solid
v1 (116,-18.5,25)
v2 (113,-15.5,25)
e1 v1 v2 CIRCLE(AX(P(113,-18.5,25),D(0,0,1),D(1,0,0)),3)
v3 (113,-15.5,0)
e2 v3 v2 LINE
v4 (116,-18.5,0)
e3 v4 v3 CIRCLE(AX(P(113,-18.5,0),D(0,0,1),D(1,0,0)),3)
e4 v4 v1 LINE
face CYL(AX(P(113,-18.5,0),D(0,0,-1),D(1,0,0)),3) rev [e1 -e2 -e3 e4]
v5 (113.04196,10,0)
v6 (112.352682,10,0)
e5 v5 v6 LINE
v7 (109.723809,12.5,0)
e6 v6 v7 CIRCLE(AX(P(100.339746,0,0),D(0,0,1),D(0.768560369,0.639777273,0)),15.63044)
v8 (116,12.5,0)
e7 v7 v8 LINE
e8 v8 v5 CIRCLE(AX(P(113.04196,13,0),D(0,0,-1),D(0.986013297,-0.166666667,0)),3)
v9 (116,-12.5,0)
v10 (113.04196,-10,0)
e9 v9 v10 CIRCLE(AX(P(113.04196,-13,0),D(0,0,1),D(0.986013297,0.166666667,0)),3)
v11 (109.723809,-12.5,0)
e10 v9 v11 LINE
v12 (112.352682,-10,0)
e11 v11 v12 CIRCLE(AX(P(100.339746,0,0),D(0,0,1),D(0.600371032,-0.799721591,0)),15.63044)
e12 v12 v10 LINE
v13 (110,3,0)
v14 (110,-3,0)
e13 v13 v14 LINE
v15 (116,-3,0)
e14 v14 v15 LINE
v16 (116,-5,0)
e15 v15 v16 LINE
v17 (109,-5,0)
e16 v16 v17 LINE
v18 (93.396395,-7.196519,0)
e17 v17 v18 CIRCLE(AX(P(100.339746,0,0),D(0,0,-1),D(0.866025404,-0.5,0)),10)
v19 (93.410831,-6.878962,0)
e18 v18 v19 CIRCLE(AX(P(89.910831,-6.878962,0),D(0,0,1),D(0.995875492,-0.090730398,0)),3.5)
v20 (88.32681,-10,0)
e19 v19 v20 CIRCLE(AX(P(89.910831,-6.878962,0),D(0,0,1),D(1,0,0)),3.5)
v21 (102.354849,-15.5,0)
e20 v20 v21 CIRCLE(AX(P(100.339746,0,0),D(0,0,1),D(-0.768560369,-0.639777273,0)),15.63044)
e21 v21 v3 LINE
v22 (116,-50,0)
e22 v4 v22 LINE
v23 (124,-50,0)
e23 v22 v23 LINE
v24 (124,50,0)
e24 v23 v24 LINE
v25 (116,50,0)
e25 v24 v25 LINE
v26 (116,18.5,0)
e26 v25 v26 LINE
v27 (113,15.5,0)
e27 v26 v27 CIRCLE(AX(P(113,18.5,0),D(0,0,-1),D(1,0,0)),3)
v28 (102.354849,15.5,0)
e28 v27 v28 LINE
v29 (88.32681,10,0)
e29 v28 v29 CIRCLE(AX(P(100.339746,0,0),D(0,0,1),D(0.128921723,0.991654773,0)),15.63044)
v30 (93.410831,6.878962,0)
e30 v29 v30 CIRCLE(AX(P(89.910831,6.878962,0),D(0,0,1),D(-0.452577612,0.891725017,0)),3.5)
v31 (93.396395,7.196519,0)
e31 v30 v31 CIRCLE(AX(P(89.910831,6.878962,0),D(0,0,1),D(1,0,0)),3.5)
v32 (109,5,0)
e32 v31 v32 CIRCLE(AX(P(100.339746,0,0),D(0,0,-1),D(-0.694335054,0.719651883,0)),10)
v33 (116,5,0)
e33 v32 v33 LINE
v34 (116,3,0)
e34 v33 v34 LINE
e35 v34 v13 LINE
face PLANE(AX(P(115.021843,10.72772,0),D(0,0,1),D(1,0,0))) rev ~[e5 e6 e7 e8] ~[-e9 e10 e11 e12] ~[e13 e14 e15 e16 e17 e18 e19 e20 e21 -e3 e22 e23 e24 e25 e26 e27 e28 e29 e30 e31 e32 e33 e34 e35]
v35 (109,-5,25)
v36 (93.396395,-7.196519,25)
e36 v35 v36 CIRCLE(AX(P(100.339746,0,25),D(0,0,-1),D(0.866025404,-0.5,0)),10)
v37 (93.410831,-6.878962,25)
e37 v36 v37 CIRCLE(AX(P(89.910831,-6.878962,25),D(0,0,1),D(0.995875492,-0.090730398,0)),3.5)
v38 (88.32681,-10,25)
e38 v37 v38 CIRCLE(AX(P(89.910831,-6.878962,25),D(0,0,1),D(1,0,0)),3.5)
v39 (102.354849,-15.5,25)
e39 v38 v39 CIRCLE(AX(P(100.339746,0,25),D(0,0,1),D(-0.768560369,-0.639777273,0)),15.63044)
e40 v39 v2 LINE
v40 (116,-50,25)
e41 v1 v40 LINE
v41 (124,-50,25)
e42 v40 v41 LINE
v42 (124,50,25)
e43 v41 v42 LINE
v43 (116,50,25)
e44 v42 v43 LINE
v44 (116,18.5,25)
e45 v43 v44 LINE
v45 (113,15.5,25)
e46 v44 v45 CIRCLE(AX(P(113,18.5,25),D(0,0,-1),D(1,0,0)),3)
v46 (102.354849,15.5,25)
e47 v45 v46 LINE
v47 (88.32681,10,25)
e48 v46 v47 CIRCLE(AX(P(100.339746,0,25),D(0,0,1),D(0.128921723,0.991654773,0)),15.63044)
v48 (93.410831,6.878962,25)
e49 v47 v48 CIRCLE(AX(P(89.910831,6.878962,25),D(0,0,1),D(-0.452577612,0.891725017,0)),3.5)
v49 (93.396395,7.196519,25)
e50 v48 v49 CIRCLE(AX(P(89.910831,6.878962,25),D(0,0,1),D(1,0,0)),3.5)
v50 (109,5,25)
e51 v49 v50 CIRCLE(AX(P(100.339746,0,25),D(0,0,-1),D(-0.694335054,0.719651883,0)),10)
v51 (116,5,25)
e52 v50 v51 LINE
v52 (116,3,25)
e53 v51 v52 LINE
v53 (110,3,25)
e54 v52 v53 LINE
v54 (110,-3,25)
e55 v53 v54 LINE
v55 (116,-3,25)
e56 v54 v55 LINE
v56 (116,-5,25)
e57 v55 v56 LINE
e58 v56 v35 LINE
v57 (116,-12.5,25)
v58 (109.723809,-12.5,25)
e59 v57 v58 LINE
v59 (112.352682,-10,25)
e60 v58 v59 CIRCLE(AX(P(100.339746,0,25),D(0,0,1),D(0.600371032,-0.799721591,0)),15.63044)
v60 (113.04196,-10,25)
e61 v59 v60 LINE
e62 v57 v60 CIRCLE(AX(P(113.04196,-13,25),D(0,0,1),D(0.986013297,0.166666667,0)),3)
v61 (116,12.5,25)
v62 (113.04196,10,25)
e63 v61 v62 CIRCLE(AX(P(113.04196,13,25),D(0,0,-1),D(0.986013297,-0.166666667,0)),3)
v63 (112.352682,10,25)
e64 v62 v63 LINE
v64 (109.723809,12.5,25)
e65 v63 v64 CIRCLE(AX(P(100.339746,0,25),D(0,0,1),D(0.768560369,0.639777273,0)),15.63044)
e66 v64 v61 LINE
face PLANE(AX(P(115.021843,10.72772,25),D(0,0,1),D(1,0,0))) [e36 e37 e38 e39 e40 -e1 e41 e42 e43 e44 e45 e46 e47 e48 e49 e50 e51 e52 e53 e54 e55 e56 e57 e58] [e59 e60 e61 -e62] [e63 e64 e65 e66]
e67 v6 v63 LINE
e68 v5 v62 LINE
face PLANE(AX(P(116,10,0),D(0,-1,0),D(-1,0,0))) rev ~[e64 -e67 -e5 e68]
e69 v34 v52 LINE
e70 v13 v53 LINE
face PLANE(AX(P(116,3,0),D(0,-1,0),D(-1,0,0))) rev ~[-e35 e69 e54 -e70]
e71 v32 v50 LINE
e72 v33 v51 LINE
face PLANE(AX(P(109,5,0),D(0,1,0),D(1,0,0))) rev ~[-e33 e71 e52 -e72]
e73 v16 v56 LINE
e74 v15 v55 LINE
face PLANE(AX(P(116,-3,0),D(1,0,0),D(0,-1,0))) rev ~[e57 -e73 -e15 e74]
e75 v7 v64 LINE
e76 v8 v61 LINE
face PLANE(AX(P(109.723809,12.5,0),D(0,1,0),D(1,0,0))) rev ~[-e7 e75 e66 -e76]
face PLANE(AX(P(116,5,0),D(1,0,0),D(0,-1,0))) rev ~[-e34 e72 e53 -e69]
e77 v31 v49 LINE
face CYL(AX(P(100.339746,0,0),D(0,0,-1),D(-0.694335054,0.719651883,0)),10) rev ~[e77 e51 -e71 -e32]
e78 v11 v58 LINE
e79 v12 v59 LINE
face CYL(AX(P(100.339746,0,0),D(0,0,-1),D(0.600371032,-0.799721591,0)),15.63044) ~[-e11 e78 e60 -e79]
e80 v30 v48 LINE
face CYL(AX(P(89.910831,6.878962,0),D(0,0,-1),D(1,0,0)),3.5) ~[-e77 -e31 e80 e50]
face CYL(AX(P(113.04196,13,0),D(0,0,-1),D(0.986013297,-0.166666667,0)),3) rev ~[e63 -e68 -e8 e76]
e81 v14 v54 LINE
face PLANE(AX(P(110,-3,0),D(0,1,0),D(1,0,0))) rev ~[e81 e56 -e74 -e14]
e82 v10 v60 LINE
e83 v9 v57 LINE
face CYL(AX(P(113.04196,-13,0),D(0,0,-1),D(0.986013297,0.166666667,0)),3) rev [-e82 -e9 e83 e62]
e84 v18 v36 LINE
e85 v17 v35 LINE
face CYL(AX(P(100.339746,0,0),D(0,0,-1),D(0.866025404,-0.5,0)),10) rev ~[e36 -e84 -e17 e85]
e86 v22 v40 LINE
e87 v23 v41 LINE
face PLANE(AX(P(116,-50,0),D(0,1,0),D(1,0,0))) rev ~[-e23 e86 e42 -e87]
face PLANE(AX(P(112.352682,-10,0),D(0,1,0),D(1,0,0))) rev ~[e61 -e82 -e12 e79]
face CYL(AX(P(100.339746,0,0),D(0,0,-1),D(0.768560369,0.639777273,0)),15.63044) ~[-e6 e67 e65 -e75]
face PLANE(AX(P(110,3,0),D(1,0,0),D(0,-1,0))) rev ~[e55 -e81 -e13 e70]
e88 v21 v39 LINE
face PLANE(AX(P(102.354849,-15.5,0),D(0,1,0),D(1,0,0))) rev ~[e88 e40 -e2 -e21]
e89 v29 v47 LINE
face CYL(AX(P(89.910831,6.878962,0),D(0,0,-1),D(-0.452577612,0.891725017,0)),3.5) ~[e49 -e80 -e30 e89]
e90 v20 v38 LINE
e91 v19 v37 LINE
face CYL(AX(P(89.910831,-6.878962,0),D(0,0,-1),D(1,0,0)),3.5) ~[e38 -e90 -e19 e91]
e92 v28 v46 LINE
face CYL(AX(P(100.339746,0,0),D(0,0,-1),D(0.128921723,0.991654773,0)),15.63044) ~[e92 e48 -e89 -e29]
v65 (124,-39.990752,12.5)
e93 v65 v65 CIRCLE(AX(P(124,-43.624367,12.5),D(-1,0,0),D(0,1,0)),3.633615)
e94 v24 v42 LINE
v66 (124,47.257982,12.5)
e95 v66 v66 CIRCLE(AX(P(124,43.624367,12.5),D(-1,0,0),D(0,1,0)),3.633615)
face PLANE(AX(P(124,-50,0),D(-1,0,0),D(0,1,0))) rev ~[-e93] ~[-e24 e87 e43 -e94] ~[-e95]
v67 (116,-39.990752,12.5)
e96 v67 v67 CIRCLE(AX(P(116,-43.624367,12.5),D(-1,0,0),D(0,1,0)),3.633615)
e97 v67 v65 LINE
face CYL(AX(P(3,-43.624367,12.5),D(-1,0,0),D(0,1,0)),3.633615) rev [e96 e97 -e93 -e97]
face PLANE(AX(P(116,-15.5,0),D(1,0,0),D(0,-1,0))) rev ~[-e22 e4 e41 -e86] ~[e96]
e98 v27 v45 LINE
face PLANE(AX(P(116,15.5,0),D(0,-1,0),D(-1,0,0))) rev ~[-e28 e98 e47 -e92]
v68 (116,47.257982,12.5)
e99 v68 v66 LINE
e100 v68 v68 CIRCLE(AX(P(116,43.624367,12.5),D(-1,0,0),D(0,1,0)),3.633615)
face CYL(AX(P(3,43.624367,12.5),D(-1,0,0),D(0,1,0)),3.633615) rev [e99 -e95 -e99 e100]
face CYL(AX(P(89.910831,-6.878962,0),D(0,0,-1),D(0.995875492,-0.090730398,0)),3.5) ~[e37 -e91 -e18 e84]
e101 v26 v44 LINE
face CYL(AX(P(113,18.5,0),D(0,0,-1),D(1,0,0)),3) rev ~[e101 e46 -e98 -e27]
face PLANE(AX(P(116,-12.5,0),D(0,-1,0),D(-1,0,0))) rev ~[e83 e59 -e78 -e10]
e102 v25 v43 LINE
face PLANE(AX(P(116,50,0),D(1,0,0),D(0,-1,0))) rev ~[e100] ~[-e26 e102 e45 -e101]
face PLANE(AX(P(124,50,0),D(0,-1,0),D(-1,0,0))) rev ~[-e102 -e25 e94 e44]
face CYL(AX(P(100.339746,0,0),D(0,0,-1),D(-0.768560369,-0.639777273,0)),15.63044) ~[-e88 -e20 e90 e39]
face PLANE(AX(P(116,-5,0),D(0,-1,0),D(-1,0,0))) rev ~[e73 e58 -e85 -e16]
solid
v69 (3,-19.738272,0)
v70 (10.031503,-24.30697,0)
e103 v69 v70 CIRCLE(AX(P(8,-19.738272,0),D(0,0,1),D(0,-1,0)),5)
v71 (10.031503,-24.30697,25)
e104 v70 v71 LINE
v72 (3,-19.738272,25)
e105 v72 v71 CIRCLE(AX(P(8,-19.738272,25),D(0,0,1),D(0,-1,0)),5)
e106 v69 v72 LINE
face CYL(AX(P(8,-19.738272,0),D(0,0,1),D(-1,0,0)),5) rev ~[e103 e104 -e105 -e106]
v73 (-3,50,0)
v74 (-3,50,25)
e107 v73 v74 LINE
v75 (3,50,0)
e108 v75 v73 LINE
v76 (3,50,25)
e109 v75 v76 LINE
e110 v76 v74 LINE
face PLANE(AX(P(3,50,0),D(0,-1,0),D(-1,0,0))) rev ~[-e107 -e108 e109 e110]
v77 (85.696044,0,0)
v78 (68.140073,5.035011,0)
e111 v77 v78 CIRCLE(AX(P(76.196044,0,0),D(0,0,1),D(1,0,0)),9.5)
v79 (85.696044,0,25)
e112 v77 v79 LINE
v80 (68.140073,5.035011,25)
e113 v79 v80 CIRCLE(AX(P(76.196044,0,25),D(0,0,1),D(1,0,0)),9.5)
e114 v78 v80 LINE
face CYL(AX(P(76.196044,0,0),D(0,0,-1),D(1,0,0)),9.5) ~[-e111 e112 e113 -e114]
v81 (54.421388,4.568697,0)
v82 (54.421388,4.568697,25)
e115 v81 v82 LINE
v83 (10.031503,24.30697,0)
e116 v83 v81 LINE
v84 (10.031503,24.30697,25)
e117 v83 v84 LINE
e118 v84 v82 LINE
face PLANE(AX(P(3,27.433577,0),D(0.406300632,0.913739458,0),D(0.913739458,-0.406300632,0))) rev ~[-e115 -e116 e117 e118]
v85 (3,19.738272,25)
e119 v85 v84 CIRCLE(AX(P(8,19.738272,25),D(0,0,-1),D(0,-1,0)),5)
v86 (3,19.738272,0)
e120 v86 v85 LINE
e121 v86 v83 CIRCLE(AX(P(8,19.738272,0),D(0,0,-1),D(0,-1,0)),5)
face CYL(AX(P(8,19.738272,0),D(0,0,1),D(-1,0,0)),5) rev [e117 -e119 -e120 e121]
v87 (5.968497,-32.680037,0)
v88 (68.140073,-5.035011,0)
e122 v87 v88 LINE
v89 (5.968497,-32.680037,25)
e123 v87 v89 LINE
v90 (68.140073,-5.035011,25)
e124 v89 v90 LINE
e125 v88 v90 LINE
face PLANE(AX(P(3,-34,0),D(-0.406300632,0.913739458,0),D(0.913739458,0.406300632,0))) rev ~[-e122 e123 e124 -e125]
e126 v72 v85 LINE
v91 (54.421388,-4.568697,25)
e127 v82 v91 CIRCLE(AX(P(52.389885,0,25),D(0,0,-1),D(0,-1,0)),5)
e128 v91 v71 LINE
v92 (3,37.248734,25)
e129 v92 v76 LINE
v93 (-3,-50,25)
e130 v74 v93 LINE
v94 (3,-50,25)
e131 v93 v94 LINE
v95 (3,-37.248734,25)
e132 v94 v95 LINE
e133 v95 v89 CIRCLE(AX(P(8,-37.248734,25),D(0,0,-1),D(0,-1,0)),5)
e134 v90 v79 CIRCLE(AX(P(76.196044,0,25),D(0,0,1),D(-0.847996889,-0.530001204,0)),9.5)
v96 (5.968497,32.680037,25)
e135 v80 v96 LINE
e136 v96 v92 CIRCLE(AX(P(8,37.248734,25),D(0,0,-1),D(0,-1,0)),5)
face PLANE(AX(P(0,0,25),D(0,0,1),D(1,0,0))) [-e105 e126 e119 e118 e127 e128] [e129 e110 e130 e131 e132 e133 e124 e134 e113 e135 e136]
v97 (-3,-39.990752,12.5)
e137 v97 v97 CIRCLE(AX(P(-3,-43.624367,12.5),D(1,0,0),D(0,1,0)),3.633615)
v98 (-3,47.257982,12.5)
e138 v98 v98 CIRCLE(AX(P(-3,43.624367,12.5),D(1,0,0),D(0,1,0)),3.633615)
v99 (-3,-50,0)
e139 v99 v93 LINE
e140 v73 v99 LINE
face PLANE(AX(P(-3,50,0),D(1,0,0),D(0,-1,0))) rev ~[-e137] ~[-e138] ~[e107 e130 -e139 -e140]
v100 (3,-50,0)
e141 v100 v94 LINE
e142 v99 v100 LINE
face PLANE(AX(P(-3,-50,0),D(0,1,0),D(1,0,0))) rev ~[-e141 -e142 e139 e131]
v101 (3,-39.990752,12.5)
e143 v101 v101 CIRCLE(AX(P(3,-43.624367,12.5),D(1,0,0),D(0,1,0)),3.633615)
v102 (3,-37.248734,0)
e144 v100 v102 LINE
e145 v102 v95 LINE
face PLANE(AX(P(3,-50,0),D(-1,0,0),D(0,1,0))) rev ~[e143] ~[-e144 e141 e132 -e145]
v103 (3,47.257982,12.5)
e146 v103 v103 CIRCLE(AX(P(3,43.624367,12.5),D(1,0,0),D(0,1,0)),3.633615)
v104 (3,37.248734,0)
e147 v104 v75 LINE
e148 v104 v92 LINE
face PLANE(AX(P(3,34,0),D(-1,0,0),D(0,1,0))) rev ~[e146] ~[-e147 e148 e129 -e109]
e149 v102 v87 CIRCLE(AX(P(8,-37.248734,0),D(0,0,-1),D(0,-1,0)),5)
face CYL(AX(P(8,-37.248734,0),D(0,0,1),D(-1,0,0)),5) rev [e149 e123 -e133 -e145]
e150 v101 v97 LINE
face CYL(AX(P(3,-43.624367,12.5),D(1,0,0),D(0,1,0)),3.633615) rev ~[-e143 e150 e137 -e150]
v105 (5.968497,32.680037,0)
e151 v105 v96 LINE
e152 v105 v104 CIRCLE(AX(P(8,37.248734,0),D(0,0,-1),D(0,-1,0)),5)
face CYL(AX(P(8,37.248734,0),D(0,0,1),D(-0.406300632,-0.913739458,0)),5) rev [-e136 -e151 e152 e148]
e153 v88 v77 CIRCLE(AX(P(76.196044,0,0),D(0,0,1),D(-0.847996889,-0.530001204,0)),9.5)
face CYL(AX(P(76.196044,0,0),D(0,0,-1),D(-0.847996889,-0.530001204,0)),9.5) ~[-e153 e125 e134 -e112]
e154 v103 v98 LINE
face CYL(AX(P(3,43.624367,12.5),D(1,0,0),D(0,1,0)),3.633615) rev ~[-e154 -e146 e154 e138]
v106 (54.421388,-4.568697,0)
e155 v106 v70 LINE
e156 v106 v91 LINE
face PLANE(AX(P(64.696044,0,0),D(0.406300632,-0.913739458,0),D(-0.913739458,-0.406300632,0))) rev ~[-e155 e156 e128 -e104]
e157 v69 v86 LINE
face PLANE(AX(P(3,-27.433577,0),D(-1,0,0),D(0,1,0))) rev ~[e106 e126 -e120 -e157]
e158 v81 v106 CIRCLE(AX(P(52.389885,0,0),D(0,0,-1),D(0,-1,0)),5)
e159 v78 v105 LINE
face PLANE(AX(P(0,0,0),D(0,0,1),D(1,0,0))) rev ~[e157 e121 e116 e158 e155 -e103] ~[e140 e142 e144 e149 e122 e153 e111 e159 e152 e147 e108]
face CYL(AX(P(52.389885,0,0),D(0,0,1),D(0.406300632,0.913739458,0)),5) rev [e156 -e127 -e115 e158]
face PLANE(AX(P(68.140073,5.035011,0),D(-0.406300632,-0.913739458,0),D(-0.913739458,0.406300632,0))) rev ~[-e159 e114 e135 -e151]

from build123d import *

# Parameters (mm, degrees)
F1_DEPTH      = 25
F2_R          = 5
F5_DEPTH      = 25
F3_R          = 3.6336150251
F6_DEPTH      = 6
F6_DEPTH_BACK = 121.001
F7_T1_DEPTH   = 25


# Not quite as in the source:
# - a fillet or chamfer that OpenCascade refuses, or shapes differently, is made with other operations: its cross-section is extruded or revolved along the edge and cut away or added


with BuildPart() as f1:
    # F0 (on Top) → F1 (new body)
    with BuildSketch(Plane.XY):
        Polygon((3, 34), (3, 50), (-3, 50), (-3, -50), (3, -50), (3, -34), (3, -27.4335767708), (3, 27.4335767708), align=None)
        with BuildLine():
            Line((68.1400732815, 5.0350114336), (3, 34))
            Line((3, 34), (3, 27.4335767708))
            Line((3, 27.4335767708), (64.6960437298, 0))
            Line((64.6960437298, 0), (3, -27.4335767708))
            Line((3, -27.4335767708), (3, -34))
            Line((3, -34), (68.1400732815, -5.0350114336))
            ThreePointArc((68.1400732815, -5.0350114336), (66.6960437298, 0), (68.1400732815, 5.0350114336))
        make_face()
        with BuildLine():
            ThreePointArc((85.6960437298, 0), (78.8150397914, 9.1318595932), (68.1400732815, 5.0350114336))
            ThreePointArc((68.1400732815, 5.0350114336), (66.6960437298, 0), (68.1400732815, -5.0350114336))
            ThreePointArc((68.1400732815, -5.0350114336), (78.8150397914, -9.1318595932), (85.6960437298, 0))
        make_face()
    extrude(amount=F1_DEPTH)

    # F2
    f2_edges = [f1.edges().sort_by_distance(p)[0] for p in [
        (64.696044, 0, 12.5),
        (3, 27.433577, 12.5),
        (3, -27.433577, 12.5),
        (3, 34, 12.5),
        (3, -34, 12.5),
    ]]
    fillet(f2_edges, radius=F2_R)


with BuildPart() as f5:
    # F4 (on Top) → F5 (new body)
    with BuildSketch(Plane.XY):
        Polygon((124, -50), (124, 50), (116, 50), (116, 15.5), (116, 12.5), (116, 10), (116, 5), (116, 3), (116, -3), (116, -5), (116, -10), (116, -12.5), (116, -15.5), (116, -50), align=None)
        with BuildLine():
            Line((116, 12.5), (116, 15.5))
            Line((116, 15.5), (102.3548491623, 15.5))
            ThreePointArc((102.3548491623, 15.5), (106.233407666, 14.476718987), (109.7238090964, 12.5))
            Line((109.7238090964, 12.5), (116, 12.5))
        make_face()
        with BuildLine():
            ThreePointArc((109.7238090964, 12.5), (106.233407666, 14.476718987), (102.3548491623, 15.5))
            ThreePointArc((102.3548491623, 15.5), (94.6343391262, 14.551940549), (88.326809564, 10))
            ThreePointArc((88.326809564, 10), (91.6045970412, 9.9418299371), (93.3963954262, 7.1965188345))
            ThreePointArc((93.3963954262, 7.1965188345), (101.7337018999, 9.9023677393), (109, 5))
            Line((109, 5), (115.1488864135, 5))
            Line((115.1488864135, 5), (116, 5))
            Line((116, 5), (116, 10))
            Line((116, 10), (112.3526823604, 10))
            ThreePointArc((112.3526823604, 10), (111.1110224533, 11.3265283145), (109.7238090964, 12.5))
        make_face()
        with BuildLine():
            Line((102.3548491623, -15.5), (116, -15.5))
            Line((116, -15.5), (116, -12.5))
            Line((116, -12.5), (109.7238090964, -12.5))
            ThreePointArc((109.7238090964, -12.5), (106.233407666, -14.476718987), (102.3548491623, -15.5))
        make_face()
        with BuildLine():
            ThreePointArc((93.3963954262, 7.1965188345), (91.6045970412, 9.9418299371), (88.326809564, 10))
            ThreePointArc((88.326809564, 10), (88.0797216709, 3.8961721588), (93.4108312054, 6.8789624418))
            ThreePointArc((93.4108312054, 6.8789624418), (93.407220398, 7.0379046123), (93.3963954262, 7.1965188345))
        make_face()
        with BuildLine():
            ThreePointArc((88.326809564, -10), (94.6343391262, -14.551940549), (102.3548491623, -15.5))
            ThreePointArc((102.3548491623, -15.5), (106.233407666, -14.476718987), (109.7238090964, -12.5))
            ThreePointArc((109.7238090964, -12.5), (111.1110224533, -11.3265283145), (112.3526823604, -10))
            Line((112.3526823604, -10), (116, -10))
            Line((116, -10), (116, -5))
            Line((116, -5), (115.1488864135, -5))
            Line((115.1488864135, -5), (109, -5))
            ThreePointArc((109, -5), (101.7337018999, -9.9023677393), (93.3963954262, -7.1965188345))
            ThreePointArc((93.3963954262, -7.1965188345), (91.6045970412, -9.9418299371), (88.326809564, -10))
        make_face()
        with BuildLine():
            ThreePointArc((93.4108312054, -6.8789624418), (88.0797216709, -3.8961721588), (88.326809564, -10))
            ThreePointArc((88.326809564, -10), (91.6045970412, -9.9418299371), (93.3963954262, -7.1965188345))
            ThreePointArc((93.3963954262, -7.1965188345), (93.407220398, -7.0379046123), (93.4108312054, -6.8789624418))
        make_face()
        Polygon((116, -3), (116, 3), (110, 3), (110, 0), (110, -3), align=None)
    extrude(amount=F5_DEPTH)


with BuildPart() as f6_tool:
    # F3 (on face) → F6 (new body, two sides)
    with BuildSketch(Plane.YZ.offset(3)) as f6_sk:
        with Locations((-43.6243672171, 12.5)):
            Circle(F3_R)
        with Locations((43.6243672171, 12.5)):
            Circle(F3_R)
    extrude(amount=-F6_DEPTH)
    extrude(f6_sk.sketch, amount=F6_DEPTH_BACK)


with BuildPart() as f1_1:
    add(f1.part)

    # F6: cut by f6_tool
    add(f6_tool.part, mode=Mode.SUBTRACT)


with BuildPart() as f5_1:
    add(f5.part)

    # F6: cut by f6_tool
    add(f6_tool.part, mode=Mode.SUBTRACT)

    # F7: fillet of radius 3 on 4 edges, made by hand

    # F7_s2 → F7_t1 (join)
    with BuildSketch(Plane.XY):
        with BuildLine():
            ThreePointArc((116, 12.5), (114.9784517816, 10.7087121525), (113.0419601084, 10))
            Line((113.0419601084, 10), (116, 10))
            Line((116, 10), (116, 12.5))
        make_face()
        with BuildLine():
            ThreePointArc((116, -12.5), (114.9784517816, -10.7087121525), (113.0419601085, -10))
            Line((113.0419601085, -10), (116, -10))
            Line((116, -10), (116, -12.5))
        make_face()
        with BuildLine():
            ThreePointArc((116, -18.5), (115.1213203436, -16.3786796564), (113, -15.5))
            Line((113, -15.5), (116, -15.5))
            Line((116, -15.5), (116, -18.5))
        make_face()
        with BuildLine():
            ThreePointArc((116, 18.5), (115.1213203436, 16.3786796564), (113, 15.5))
            Line((113, 15.5), (116, 15.5))
            Line((116, 15.5), (116, 18.5))
        make_face()
    extrude(amount=F7_T1_DEPTH)


solid = Compound([f1_1.part, f5_1.part])
